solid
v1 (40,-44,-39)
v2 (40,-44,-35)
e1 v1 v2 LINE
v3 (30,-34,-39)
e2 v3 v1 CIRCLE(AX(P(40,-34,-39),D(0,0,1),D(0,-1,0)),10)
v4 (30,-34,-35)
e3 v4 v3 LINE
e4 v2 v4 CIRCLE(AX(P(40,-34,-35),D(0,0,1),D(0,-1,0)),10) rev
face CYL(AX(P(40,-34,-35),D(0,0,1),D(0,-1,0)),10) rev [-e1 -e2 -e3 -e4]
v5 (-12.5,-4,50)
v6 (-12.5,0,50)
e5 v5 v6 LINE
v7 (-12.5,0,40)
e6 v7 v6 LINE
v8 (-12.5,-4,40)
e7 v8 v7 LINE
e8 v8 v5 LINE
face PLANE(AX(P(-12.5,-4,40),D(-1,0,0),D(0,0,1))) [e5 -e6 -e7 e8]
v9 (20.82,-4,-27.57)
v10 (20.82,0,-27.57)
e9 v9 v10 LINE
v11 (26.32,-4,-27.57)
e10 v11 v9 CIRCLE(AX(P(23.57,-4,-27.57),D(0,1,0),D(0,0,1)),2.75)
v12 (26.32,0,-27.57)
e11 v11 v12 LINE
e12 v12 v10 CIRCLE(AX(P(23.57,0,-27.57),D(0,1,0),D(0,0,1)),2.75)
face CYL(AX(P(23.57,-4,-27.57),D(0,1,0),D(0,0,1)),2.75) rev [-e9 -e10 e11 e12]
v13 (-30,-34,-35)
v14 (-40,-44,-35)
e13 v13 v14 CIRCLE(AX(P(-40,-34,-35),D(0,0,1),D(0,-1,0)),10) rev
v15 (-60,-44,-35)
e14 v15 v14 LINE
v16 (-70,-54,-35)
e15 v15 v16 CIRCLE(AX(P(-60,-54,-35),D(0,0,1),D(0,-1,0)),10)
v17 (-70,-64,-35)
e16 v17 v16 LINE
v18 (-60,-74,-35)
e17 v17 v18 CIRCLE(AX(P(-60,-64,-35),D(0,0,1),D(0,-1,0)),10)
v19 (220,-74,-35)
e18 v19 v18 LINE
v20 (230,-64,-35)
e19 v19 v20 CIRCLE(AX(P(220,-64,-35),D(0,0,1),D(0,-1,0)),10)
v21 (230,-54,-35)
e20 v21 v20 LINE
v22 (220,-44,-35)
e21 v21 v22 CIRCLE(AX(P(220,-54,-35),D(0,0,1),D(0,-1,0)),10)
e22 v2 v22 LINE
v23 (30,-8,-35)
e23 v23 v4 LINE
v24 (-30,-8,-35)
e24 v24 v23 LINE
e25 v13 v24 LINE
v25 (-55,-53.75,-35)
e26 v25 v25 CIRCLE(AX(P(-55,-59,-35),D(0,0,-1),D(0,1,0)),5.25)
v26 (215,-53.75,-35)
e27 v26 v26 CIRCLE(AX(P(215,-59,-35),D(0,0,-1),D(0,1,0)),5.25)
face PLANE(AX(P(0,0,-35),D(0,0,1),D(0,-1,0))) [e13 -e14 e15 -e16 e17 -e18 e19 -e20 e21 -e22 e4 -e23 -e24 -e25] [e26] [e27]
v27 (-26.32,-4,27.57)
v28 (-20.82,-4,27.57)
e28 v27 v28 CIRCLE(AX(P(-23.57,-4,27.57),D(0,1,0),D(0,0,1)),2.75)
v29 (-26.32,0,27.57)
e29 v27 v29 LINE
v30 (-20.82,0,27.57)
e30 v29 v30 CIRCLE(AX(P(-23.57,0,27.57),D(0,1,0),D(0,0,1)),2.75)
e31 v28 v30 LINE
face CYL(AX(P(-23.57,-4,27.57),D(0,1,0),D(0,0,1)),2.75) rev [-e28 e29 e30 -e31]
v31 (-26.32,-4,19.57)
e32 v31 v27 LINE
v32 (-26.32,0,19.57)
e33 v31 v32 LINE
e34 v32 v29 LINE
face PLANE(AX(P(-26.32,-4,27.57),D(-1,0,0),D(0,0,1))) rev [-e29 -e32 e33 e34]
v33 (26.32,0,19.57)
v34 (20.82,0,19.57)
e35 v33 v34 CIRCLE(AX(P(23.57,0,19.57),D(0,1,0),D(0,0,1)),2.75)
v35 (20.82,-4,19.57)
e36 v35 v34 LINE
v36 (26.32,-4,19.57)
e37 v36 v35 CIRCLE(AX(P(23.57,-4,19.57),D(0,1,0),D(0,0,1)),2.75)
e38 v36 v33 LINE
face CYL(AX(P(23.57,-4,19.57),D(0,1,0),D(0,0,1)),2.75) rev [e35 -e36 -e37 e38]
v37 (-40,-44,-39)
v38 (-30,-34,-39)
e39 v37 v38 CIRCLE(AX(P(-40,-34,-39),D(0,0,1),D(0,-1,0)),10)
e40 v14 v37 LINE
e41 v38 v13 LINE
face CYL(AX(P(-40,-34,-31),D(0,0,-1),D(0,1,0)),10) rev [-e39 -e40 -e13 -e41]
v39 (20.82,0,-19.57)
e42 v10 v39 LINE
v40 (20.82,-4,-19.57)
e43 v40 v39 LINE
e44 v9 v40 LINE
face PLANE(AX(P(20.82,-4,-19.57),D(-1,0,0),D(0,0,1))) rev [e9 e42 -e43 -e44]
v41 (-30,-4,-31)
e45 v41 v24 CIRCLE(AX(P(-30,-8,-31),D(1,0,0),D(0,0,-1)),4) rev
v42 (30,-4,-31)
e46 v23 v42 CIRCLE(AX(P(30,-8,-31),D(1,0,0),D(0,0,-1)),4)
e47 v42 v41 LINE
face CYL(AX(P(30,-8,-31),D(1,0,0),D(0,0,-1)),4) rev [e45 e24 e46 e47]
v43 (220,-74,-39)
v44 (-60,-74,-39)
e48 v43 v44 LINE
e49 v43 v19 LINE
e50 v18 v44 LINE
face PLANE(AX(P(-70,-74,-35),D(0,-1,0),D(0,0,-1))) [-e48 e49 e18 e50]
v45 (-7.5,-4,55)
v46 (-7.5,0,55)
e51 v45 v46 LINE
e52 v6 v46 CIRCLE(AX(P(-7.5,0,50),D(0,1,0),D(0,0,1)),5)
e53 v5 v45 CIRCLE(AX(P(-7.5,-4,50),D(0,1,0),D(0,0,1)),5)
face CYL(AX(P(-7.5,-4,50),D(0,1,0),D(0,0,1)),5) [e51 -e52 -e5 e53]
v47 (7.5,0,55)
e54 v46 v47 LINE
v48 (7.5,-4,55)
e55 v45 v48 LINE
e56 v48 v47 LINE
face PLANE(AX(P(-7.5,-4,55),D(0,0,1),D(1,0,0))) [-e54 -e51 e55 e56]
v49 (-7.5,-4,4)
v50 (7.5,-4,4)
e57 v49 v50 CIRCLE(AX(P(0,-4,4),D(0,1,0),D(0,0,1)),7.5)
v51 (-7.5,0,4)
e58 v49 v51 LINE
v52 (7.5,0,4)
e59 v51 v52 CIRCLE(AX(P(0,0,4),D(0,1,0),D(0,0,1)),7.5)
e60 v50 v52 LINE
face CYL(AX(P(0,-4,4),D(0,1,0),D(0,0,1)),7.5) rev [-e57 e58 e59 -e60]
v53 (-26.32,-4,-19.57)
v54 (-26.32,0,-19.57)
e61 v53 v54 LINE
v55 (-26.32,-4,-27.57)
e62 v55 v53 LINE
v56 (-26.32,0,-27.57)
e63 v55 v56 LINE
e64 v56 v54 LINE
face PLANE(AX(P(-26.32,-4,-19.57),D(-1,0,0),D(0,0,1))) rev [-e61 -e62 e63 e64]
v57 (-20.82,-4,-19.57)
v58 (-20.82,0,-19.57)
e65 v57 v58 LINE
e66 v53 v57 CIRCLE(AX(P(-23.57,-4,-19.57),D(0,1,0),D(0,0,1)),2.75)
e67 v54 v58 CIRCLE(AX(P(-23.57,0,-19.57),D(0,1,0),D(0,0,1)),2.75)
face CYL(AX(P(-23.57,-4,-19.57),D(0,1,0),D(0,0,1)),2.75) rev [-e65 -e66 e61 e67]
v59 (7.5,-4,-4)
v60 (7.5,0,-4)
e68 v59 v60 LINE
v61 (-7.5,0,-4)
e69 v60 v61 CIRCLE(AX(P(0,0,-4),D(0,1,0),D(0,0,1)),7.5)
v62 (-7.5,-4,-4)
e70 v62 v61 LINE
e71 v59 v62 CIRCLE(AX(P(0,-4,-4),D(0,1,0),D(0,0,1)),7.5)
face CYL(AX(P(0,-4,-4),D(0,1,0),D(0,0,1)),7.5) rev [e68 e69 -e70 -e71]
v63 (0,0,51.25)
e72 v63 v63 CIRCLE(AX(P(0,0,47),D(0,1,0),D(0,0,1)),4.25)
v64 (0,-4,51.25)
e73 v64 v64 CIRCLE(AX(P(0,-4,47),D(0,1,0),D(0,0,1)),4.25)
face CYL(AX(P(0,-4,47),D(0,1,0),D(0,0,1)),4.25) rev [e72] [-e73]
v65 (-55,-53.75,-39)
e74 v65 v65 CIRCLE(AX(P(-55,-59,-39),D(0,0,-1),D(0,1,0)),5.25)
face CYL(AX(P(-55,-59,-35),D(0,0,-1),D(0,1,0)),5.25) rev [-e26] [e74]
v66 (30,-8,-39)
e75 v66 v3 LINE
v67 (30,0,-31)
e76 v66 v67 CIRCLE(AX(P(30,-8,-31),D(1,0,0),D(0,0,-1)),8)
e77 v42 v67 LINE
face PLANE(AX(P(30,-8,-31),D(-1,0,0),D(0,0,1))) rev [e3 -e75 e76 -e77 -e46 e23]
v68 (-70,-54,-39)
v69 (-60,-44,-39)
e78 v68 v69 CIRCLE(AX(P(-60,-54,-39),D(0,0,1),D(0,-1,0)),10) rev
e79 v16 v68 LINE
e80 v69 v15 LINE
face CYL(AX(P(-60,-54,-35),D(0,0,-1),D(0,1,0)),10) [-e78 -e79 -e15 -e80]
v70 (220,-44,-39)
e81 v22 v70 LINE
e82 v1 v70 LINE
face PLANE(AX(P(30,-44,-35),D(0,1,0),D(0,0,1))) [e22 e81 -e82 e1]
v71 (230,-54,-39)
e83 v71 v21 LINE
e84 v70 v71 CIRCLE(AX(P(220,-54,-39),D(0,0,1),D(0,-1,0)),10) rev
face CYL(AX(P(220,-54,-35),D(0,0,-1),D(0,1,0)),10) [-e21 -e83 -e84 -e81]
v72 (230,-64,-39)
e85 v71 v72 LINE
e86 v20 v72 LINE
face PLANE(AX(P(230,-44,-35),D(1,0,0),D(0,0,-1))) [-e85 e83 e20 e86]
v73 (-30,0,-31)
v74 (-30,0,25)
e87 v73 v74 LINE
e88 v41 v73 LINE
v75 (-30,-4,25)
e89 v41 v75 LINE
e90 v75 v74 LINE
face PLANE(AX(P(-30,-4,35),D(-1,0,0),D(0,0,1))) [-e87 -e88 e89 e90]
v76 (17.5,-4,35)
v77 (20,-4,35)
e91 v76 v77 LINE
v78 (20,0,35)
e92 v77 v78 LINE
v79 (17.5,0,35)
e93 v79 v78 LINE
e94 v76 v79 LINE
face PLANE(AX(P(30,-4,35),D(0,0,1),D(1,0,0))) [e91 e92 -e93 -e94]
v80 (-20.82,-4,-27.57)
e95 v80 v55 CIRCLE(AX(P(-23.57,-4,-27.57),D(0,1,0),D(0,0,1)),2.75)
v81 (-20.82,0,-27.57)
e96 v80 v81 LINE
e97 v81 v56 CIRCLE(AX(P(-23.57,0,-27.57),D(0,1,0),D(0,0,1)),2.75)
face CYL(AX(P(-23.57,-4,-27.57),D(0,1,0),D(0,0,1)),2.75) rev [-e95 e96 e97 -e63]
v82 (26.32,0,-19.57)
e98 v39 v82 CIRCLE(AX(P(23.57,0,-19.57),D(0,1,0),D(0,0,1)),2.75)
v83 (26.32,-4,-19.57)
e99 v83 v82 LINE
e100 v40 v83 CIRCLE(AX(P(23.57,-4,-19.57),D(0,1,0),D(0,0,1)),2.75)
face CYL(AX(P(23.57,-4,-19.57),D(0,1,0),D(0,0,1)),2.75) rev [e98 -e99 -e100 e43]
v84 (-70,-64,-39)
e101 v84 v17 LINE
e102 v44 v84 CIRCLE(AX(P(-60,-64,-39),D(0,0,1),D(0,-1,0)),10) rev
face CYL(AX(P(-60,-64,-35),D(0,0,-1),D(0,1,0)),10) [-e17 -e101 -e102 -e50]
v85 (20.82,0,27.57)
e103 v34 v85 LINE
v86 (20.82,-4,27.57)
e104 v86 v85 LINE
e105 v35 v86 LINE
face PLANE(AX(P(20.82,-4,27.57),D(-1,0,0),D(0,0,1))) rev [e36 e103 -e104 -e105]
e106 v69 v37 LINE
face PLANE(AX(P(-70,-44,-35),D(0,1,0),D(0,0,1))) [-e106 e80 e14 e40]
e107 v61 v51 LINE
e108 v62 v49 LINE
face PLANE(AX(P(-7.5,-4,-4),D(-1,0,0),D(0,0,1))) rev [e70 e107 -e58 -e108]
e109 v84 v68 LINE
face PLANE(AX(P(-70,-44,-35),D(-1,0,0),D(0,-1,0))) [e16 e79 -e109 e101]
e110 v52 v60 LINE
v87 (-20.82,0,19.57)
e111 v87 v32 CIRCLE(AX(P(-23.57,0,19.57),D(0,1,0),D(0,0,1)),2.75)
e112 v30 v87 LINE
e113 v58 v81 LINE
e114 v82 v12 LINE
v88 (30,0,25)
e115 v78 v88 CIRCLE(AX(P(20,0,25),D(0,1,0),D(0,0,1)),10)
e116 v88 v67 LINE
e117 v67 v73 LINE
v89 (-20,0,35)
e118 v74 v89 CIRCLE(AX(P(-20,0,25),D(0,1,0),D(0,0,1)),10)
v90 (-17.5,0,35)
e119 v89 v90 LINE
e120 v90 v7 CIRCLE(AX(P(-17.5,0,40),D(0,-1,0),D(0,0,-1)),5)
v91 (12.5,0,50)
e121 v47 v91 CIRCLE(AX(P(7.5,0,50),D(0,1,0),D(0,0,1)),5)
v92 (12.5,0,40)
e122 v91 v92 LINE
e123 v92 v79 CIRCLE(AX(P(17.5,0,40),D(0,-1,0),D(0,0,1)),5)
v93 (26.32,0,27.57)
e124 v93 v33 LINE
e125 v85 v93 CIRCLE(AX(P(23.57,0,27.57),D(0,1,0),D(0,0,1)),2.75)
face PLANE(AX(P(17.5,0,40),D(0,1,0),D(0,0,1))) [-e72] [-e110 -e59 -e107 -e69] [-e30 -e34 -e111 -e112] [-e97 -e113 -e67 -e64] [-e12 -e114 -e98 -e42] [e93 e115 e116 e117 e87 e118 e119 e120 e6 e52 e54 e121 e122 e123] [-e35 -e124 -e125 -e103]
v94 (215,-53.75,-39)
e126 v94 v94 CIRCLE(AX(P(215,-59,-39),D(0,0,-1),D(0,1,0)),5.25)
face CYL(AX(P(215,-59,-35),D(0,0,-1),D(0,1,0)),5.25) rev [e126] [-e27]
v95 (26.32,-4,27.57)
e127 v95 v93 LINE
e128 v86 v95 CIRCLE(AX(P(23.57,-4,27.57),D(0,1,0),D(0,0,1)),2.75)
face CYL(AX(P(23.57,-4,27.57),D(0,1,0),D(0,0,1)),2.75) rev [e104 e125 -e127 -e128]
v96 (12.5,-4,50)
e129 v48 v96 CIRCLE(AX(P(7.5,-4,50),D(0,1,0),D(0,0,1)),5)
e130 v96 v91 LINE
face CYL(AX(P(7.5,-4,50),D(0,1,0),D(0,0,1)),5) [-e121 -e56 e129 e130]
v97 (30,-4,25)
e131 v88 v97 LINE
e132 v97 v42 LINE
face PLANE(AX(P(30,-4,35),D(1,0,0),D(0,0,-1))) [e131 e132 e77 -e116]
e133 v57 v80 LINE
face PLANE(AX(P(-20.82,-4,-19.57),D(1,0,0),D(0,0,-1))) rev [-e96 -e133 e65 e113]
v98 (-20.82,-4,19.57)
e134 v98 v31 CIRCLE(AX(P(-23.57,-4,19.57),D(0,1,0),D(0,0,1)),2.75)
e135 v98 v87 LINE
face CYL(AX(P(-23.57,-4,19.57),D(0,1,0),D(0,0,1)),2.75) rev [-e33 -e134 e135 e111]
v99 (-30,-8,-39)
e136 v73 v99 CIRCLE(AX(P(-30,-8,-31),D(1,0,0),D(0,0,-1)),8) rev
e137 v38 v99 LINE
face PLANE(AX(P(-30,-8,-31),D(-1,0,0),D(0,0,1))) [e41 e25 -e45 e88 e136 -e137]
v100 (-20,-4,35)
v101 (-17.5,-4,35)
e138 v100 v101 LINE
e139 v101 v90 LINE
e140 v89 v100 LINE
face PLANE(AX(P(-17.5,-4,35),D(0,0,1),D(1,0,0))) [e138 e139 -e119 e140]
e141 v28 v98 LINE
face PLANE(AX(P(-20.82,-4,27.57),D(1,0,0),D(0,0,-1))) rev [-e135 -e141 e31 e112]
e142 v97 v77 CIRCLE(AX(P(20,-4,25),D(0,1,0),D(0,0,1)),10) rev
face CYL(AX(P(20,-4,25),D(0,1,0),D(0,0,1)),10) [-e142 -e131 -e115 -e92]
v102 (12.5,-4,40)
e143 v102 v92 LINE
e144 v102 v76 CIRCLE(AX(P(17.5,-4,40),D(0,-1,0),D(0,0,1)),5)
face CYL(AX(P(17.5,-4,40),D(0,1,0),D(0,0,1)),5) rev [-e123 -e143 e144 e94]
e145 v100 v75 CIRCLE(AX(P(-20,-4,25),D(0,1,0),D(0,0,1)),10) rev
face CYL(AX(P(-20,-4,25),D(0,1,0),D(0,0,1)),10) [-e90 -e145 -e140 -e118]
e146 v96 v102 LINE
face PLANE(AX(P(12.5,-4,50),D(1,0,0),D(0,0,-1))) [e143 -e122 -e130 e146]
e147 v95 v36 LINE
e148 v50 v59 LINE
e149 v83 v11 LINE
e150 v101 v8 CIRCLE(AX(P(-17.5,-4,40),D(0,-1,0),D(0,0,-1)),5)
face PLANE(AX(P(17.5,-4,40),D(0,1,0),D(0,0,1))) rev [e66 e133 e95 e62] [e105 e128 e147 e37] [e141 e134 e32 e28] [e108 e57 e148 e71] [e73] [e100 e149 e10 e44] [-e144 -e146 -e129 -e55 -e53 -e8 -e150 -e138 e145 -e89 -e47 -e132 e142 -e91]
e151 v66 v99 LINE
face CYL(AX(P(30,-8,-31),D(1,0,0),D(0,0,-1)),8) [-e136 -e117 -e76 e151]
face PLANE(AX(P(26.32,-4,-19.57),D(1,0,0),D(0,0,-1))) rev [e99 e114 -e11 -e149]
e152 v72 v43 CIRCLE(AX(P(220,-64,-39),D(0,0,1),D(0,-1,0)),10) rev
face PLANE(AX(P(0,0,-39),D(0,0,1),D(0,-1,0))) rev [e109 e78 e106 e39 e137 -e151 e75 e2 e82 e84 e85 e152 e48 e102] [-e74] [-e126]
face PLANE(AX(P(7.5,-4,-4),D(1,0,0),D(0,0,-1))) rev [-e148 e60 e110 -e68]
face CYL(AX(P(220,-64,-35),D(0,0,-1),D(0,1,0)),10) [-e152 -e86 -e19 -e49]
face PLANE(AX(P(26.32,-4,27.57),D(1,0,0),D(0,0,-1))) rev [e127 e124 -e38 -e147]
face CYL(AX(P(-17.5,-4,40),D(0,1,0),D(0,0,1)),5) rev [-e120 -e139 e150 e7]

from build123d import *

# Parameters (mm, degrees)
SKETCH1_R                    = 4.25
BASE_FLANGE1_DEPTH           = 4
EDGE_FLANGE1_STRIP_W         = 24
EDGE_FLANGE1_STRIP_H         = 4
EDGE_FLANGE1_STRIP_CUT_DEPTH = 60
EDGE_FLANGE1_DEPTH           = 60
SKETCH11_R                   = 5.25
TAB1_DEPTH                   = 4
FILLET2_R                    = 10


# Sheet-metal steps are written as plain solids
with BuildPart() as part:
    # Sketch1 → Base-Flange1 (new body)
    with BuildSketch(Plane(origin=(0, 0, 0), x_dir=(1, 0, 0), z_dir=(0, 1, 0))):
        with BuildLine():
            Line((30, -35), (17.5, -35))
            ThreePointArc((17.5, -35), (13.964466094, -36.464466094), (12.5, -40))
            Line((12.5, -40), (12.5, -50))
            ThreePointArc((12.5, -50), (11.035533906, -53.535533906), (7.5, -55))
            Line((7.5, -55), (-7.5, -55))
            ThreePointArc((-7.5, -55), (-11.035533906, -53.535533906), (-12.5, -50))
            Line((-12.5, -50), (-12.5, -40))
            ThreePointArc((-12.5, -40), (-13.964466094, -36.464466094), (-17.5, -35))
            Line((-17.5, -35), (-30, -35))
            Line((-30, -35), (-30, 35))
            Line((-30, 35), (30, 35))
            Line((30, 35), (30, -35))
        make_face()
        with Locations(Location((0, -47, 0), (0, 0, 270))):
            Circle(SKETCH1_R, mode=Mode.SUBTRACT)
        with BuildLine():
            Line((-26.32, 19.57), (-26.32, 27.57))
            ThreePointArc((-26.32, 27.57), (-23.57, 30.32), (-20.82, 27.57))
            Line((-20.82, 27.57), (-20.82, 19.57))
            ThreePointArc((-20.82, 19.57), (-23.57, 16.82), (-26.32, 19.57))
        make_face(mode=Mode.SUBTRACT)
        with BuildLine():
            Line((26.32, 19.57), (26.32, 27.57))
            ThreePointArc((26.32, 27.57), (23.57, 30.32), (20.82, 27.57))
            Line((20.82, 27.57), (20.82, 19.57))
            ThreePointArc((20.82, 19.57), (23.57, 16.82), (26.32, 19.57))
        make_face(mode=Mode.SUBTRACT)
        with BuildLine():
            Line((26.32, -27.57), (26.32, -19.57))
            ThreePointArc((26.32, -19.57), (23.57, -16.82), (20.82, -19.57))
            Line((20.82, -19.57), (20.82, -27.57))
            ThreePointArc((20.82, -27.57), (23.57, -30.32), (26.32, -27.57))
        make_face(mode=Mode.SUBTRACT)
        with BuildLine():
            Line((-20.82, -27.57), (-20.82, -19.57))
            ThreePointArc((-20.82, -19.57), (-23.57, -16.82), (-26.32, -19.57))
            Line((-26.32, -19.57), (-26.32, -27.57))
            ThreePointArc((-26.32, -27.57), (-23.57, -30.32), (-20.82, -27.57))
        make_face(mode=Mode.SUBTRACT)
        with BuildLine():
            Line((7.5, 4), (7.5, -4))
            ThreePointArc((7.5, -4), (0, -11.5), (-7.5, -4))
            Line((-7.5, -4), (-7.5, 4))
            ThreePointArc((-7.5, 4), (0, 11.5), (7.5, 4))
        make_face(mode=Mode.SUBTRACT)
    extrude(amount=-BASE_FLANGE1_DEPTH)

    # Edge-Flange1 strip (across the edge) → Edge-Flange1 strip cut (cut)
    with BuildSketch(Plane(origin=(-30, -4, -35), x_dir=(0, 0, 1), z_dir=(1, 0, 0))):
        with Locations((-8, -2)):
            Rectangle(EDGE_FLANGE1_STRIP_W, EDGE_FLANGE1_STRIP_H)
    extrude(amount=EDGE_FLANGE1_STRIP_CUT_DEPTH, mode=Mode.SUBTRACT)

    # Edge-Flange1 section (across the edge) → Edge-Flange1 (add)
    with BuildSketch(Plane(origin=(-30, -4, -35), x_dir=(0, 0, 1), z_dir=(1, 0, 0))):
        with BuildLine():
            Line((-4, 4), (-4, 40))
            Line((-4, 40), (0, 40))
            Line((0, 40), (0, 4))
            ThreePointArc((0, 4), (1.171572875, 1.171572875), (4, 0))
            Line((4, 0), (4, -4))
            ThreePointArc((4, -4), (-1.656854249, -1.656854249), (-4, 4))
        make_face()
    extrude(amount=EDGE_FLANGE1_DEPTH)

    # Sketch11 → Tab1 (add)
    with BuildSketch(Plane(origin=(0, 0, -39), x_dir=(-1, 0, 0), z_dir=(0, 0, -1))):
        Polygon((-30, -44), (-230, -44), (-230, -74), (70, -74), (70, -44), (30, -44), (30, -8), (-30, -8), align=None)
        with Locations(Location((-215, -59, 0), (0, 0, 90))):
            Circle(SKETCH11_R, mode=Mode.SUBTRACT)
        with Locations(Location((55, -59, 0), (0, 0, 90))):
            Circle(SKETCH11_R, mode=Mode.SUBTRACT)
    extrude(amount=-TAB1_DEPTH)

    # Fillet2
    fillet2_edges = [part.edges().sort_by_distance(p)[0] for p in [
        (-30, -44, -37),
        (30, -44, -37),
        (-70, -44, -37),
        (-70, -74, -37),
        (230, -74, -37),
        (230, -44, -37),
        (30, -2, 35),
        (-30, -2, 35),
    ]]
    fillet(fillet2_edges, radius=FILLET2_R)


solid = part.part
